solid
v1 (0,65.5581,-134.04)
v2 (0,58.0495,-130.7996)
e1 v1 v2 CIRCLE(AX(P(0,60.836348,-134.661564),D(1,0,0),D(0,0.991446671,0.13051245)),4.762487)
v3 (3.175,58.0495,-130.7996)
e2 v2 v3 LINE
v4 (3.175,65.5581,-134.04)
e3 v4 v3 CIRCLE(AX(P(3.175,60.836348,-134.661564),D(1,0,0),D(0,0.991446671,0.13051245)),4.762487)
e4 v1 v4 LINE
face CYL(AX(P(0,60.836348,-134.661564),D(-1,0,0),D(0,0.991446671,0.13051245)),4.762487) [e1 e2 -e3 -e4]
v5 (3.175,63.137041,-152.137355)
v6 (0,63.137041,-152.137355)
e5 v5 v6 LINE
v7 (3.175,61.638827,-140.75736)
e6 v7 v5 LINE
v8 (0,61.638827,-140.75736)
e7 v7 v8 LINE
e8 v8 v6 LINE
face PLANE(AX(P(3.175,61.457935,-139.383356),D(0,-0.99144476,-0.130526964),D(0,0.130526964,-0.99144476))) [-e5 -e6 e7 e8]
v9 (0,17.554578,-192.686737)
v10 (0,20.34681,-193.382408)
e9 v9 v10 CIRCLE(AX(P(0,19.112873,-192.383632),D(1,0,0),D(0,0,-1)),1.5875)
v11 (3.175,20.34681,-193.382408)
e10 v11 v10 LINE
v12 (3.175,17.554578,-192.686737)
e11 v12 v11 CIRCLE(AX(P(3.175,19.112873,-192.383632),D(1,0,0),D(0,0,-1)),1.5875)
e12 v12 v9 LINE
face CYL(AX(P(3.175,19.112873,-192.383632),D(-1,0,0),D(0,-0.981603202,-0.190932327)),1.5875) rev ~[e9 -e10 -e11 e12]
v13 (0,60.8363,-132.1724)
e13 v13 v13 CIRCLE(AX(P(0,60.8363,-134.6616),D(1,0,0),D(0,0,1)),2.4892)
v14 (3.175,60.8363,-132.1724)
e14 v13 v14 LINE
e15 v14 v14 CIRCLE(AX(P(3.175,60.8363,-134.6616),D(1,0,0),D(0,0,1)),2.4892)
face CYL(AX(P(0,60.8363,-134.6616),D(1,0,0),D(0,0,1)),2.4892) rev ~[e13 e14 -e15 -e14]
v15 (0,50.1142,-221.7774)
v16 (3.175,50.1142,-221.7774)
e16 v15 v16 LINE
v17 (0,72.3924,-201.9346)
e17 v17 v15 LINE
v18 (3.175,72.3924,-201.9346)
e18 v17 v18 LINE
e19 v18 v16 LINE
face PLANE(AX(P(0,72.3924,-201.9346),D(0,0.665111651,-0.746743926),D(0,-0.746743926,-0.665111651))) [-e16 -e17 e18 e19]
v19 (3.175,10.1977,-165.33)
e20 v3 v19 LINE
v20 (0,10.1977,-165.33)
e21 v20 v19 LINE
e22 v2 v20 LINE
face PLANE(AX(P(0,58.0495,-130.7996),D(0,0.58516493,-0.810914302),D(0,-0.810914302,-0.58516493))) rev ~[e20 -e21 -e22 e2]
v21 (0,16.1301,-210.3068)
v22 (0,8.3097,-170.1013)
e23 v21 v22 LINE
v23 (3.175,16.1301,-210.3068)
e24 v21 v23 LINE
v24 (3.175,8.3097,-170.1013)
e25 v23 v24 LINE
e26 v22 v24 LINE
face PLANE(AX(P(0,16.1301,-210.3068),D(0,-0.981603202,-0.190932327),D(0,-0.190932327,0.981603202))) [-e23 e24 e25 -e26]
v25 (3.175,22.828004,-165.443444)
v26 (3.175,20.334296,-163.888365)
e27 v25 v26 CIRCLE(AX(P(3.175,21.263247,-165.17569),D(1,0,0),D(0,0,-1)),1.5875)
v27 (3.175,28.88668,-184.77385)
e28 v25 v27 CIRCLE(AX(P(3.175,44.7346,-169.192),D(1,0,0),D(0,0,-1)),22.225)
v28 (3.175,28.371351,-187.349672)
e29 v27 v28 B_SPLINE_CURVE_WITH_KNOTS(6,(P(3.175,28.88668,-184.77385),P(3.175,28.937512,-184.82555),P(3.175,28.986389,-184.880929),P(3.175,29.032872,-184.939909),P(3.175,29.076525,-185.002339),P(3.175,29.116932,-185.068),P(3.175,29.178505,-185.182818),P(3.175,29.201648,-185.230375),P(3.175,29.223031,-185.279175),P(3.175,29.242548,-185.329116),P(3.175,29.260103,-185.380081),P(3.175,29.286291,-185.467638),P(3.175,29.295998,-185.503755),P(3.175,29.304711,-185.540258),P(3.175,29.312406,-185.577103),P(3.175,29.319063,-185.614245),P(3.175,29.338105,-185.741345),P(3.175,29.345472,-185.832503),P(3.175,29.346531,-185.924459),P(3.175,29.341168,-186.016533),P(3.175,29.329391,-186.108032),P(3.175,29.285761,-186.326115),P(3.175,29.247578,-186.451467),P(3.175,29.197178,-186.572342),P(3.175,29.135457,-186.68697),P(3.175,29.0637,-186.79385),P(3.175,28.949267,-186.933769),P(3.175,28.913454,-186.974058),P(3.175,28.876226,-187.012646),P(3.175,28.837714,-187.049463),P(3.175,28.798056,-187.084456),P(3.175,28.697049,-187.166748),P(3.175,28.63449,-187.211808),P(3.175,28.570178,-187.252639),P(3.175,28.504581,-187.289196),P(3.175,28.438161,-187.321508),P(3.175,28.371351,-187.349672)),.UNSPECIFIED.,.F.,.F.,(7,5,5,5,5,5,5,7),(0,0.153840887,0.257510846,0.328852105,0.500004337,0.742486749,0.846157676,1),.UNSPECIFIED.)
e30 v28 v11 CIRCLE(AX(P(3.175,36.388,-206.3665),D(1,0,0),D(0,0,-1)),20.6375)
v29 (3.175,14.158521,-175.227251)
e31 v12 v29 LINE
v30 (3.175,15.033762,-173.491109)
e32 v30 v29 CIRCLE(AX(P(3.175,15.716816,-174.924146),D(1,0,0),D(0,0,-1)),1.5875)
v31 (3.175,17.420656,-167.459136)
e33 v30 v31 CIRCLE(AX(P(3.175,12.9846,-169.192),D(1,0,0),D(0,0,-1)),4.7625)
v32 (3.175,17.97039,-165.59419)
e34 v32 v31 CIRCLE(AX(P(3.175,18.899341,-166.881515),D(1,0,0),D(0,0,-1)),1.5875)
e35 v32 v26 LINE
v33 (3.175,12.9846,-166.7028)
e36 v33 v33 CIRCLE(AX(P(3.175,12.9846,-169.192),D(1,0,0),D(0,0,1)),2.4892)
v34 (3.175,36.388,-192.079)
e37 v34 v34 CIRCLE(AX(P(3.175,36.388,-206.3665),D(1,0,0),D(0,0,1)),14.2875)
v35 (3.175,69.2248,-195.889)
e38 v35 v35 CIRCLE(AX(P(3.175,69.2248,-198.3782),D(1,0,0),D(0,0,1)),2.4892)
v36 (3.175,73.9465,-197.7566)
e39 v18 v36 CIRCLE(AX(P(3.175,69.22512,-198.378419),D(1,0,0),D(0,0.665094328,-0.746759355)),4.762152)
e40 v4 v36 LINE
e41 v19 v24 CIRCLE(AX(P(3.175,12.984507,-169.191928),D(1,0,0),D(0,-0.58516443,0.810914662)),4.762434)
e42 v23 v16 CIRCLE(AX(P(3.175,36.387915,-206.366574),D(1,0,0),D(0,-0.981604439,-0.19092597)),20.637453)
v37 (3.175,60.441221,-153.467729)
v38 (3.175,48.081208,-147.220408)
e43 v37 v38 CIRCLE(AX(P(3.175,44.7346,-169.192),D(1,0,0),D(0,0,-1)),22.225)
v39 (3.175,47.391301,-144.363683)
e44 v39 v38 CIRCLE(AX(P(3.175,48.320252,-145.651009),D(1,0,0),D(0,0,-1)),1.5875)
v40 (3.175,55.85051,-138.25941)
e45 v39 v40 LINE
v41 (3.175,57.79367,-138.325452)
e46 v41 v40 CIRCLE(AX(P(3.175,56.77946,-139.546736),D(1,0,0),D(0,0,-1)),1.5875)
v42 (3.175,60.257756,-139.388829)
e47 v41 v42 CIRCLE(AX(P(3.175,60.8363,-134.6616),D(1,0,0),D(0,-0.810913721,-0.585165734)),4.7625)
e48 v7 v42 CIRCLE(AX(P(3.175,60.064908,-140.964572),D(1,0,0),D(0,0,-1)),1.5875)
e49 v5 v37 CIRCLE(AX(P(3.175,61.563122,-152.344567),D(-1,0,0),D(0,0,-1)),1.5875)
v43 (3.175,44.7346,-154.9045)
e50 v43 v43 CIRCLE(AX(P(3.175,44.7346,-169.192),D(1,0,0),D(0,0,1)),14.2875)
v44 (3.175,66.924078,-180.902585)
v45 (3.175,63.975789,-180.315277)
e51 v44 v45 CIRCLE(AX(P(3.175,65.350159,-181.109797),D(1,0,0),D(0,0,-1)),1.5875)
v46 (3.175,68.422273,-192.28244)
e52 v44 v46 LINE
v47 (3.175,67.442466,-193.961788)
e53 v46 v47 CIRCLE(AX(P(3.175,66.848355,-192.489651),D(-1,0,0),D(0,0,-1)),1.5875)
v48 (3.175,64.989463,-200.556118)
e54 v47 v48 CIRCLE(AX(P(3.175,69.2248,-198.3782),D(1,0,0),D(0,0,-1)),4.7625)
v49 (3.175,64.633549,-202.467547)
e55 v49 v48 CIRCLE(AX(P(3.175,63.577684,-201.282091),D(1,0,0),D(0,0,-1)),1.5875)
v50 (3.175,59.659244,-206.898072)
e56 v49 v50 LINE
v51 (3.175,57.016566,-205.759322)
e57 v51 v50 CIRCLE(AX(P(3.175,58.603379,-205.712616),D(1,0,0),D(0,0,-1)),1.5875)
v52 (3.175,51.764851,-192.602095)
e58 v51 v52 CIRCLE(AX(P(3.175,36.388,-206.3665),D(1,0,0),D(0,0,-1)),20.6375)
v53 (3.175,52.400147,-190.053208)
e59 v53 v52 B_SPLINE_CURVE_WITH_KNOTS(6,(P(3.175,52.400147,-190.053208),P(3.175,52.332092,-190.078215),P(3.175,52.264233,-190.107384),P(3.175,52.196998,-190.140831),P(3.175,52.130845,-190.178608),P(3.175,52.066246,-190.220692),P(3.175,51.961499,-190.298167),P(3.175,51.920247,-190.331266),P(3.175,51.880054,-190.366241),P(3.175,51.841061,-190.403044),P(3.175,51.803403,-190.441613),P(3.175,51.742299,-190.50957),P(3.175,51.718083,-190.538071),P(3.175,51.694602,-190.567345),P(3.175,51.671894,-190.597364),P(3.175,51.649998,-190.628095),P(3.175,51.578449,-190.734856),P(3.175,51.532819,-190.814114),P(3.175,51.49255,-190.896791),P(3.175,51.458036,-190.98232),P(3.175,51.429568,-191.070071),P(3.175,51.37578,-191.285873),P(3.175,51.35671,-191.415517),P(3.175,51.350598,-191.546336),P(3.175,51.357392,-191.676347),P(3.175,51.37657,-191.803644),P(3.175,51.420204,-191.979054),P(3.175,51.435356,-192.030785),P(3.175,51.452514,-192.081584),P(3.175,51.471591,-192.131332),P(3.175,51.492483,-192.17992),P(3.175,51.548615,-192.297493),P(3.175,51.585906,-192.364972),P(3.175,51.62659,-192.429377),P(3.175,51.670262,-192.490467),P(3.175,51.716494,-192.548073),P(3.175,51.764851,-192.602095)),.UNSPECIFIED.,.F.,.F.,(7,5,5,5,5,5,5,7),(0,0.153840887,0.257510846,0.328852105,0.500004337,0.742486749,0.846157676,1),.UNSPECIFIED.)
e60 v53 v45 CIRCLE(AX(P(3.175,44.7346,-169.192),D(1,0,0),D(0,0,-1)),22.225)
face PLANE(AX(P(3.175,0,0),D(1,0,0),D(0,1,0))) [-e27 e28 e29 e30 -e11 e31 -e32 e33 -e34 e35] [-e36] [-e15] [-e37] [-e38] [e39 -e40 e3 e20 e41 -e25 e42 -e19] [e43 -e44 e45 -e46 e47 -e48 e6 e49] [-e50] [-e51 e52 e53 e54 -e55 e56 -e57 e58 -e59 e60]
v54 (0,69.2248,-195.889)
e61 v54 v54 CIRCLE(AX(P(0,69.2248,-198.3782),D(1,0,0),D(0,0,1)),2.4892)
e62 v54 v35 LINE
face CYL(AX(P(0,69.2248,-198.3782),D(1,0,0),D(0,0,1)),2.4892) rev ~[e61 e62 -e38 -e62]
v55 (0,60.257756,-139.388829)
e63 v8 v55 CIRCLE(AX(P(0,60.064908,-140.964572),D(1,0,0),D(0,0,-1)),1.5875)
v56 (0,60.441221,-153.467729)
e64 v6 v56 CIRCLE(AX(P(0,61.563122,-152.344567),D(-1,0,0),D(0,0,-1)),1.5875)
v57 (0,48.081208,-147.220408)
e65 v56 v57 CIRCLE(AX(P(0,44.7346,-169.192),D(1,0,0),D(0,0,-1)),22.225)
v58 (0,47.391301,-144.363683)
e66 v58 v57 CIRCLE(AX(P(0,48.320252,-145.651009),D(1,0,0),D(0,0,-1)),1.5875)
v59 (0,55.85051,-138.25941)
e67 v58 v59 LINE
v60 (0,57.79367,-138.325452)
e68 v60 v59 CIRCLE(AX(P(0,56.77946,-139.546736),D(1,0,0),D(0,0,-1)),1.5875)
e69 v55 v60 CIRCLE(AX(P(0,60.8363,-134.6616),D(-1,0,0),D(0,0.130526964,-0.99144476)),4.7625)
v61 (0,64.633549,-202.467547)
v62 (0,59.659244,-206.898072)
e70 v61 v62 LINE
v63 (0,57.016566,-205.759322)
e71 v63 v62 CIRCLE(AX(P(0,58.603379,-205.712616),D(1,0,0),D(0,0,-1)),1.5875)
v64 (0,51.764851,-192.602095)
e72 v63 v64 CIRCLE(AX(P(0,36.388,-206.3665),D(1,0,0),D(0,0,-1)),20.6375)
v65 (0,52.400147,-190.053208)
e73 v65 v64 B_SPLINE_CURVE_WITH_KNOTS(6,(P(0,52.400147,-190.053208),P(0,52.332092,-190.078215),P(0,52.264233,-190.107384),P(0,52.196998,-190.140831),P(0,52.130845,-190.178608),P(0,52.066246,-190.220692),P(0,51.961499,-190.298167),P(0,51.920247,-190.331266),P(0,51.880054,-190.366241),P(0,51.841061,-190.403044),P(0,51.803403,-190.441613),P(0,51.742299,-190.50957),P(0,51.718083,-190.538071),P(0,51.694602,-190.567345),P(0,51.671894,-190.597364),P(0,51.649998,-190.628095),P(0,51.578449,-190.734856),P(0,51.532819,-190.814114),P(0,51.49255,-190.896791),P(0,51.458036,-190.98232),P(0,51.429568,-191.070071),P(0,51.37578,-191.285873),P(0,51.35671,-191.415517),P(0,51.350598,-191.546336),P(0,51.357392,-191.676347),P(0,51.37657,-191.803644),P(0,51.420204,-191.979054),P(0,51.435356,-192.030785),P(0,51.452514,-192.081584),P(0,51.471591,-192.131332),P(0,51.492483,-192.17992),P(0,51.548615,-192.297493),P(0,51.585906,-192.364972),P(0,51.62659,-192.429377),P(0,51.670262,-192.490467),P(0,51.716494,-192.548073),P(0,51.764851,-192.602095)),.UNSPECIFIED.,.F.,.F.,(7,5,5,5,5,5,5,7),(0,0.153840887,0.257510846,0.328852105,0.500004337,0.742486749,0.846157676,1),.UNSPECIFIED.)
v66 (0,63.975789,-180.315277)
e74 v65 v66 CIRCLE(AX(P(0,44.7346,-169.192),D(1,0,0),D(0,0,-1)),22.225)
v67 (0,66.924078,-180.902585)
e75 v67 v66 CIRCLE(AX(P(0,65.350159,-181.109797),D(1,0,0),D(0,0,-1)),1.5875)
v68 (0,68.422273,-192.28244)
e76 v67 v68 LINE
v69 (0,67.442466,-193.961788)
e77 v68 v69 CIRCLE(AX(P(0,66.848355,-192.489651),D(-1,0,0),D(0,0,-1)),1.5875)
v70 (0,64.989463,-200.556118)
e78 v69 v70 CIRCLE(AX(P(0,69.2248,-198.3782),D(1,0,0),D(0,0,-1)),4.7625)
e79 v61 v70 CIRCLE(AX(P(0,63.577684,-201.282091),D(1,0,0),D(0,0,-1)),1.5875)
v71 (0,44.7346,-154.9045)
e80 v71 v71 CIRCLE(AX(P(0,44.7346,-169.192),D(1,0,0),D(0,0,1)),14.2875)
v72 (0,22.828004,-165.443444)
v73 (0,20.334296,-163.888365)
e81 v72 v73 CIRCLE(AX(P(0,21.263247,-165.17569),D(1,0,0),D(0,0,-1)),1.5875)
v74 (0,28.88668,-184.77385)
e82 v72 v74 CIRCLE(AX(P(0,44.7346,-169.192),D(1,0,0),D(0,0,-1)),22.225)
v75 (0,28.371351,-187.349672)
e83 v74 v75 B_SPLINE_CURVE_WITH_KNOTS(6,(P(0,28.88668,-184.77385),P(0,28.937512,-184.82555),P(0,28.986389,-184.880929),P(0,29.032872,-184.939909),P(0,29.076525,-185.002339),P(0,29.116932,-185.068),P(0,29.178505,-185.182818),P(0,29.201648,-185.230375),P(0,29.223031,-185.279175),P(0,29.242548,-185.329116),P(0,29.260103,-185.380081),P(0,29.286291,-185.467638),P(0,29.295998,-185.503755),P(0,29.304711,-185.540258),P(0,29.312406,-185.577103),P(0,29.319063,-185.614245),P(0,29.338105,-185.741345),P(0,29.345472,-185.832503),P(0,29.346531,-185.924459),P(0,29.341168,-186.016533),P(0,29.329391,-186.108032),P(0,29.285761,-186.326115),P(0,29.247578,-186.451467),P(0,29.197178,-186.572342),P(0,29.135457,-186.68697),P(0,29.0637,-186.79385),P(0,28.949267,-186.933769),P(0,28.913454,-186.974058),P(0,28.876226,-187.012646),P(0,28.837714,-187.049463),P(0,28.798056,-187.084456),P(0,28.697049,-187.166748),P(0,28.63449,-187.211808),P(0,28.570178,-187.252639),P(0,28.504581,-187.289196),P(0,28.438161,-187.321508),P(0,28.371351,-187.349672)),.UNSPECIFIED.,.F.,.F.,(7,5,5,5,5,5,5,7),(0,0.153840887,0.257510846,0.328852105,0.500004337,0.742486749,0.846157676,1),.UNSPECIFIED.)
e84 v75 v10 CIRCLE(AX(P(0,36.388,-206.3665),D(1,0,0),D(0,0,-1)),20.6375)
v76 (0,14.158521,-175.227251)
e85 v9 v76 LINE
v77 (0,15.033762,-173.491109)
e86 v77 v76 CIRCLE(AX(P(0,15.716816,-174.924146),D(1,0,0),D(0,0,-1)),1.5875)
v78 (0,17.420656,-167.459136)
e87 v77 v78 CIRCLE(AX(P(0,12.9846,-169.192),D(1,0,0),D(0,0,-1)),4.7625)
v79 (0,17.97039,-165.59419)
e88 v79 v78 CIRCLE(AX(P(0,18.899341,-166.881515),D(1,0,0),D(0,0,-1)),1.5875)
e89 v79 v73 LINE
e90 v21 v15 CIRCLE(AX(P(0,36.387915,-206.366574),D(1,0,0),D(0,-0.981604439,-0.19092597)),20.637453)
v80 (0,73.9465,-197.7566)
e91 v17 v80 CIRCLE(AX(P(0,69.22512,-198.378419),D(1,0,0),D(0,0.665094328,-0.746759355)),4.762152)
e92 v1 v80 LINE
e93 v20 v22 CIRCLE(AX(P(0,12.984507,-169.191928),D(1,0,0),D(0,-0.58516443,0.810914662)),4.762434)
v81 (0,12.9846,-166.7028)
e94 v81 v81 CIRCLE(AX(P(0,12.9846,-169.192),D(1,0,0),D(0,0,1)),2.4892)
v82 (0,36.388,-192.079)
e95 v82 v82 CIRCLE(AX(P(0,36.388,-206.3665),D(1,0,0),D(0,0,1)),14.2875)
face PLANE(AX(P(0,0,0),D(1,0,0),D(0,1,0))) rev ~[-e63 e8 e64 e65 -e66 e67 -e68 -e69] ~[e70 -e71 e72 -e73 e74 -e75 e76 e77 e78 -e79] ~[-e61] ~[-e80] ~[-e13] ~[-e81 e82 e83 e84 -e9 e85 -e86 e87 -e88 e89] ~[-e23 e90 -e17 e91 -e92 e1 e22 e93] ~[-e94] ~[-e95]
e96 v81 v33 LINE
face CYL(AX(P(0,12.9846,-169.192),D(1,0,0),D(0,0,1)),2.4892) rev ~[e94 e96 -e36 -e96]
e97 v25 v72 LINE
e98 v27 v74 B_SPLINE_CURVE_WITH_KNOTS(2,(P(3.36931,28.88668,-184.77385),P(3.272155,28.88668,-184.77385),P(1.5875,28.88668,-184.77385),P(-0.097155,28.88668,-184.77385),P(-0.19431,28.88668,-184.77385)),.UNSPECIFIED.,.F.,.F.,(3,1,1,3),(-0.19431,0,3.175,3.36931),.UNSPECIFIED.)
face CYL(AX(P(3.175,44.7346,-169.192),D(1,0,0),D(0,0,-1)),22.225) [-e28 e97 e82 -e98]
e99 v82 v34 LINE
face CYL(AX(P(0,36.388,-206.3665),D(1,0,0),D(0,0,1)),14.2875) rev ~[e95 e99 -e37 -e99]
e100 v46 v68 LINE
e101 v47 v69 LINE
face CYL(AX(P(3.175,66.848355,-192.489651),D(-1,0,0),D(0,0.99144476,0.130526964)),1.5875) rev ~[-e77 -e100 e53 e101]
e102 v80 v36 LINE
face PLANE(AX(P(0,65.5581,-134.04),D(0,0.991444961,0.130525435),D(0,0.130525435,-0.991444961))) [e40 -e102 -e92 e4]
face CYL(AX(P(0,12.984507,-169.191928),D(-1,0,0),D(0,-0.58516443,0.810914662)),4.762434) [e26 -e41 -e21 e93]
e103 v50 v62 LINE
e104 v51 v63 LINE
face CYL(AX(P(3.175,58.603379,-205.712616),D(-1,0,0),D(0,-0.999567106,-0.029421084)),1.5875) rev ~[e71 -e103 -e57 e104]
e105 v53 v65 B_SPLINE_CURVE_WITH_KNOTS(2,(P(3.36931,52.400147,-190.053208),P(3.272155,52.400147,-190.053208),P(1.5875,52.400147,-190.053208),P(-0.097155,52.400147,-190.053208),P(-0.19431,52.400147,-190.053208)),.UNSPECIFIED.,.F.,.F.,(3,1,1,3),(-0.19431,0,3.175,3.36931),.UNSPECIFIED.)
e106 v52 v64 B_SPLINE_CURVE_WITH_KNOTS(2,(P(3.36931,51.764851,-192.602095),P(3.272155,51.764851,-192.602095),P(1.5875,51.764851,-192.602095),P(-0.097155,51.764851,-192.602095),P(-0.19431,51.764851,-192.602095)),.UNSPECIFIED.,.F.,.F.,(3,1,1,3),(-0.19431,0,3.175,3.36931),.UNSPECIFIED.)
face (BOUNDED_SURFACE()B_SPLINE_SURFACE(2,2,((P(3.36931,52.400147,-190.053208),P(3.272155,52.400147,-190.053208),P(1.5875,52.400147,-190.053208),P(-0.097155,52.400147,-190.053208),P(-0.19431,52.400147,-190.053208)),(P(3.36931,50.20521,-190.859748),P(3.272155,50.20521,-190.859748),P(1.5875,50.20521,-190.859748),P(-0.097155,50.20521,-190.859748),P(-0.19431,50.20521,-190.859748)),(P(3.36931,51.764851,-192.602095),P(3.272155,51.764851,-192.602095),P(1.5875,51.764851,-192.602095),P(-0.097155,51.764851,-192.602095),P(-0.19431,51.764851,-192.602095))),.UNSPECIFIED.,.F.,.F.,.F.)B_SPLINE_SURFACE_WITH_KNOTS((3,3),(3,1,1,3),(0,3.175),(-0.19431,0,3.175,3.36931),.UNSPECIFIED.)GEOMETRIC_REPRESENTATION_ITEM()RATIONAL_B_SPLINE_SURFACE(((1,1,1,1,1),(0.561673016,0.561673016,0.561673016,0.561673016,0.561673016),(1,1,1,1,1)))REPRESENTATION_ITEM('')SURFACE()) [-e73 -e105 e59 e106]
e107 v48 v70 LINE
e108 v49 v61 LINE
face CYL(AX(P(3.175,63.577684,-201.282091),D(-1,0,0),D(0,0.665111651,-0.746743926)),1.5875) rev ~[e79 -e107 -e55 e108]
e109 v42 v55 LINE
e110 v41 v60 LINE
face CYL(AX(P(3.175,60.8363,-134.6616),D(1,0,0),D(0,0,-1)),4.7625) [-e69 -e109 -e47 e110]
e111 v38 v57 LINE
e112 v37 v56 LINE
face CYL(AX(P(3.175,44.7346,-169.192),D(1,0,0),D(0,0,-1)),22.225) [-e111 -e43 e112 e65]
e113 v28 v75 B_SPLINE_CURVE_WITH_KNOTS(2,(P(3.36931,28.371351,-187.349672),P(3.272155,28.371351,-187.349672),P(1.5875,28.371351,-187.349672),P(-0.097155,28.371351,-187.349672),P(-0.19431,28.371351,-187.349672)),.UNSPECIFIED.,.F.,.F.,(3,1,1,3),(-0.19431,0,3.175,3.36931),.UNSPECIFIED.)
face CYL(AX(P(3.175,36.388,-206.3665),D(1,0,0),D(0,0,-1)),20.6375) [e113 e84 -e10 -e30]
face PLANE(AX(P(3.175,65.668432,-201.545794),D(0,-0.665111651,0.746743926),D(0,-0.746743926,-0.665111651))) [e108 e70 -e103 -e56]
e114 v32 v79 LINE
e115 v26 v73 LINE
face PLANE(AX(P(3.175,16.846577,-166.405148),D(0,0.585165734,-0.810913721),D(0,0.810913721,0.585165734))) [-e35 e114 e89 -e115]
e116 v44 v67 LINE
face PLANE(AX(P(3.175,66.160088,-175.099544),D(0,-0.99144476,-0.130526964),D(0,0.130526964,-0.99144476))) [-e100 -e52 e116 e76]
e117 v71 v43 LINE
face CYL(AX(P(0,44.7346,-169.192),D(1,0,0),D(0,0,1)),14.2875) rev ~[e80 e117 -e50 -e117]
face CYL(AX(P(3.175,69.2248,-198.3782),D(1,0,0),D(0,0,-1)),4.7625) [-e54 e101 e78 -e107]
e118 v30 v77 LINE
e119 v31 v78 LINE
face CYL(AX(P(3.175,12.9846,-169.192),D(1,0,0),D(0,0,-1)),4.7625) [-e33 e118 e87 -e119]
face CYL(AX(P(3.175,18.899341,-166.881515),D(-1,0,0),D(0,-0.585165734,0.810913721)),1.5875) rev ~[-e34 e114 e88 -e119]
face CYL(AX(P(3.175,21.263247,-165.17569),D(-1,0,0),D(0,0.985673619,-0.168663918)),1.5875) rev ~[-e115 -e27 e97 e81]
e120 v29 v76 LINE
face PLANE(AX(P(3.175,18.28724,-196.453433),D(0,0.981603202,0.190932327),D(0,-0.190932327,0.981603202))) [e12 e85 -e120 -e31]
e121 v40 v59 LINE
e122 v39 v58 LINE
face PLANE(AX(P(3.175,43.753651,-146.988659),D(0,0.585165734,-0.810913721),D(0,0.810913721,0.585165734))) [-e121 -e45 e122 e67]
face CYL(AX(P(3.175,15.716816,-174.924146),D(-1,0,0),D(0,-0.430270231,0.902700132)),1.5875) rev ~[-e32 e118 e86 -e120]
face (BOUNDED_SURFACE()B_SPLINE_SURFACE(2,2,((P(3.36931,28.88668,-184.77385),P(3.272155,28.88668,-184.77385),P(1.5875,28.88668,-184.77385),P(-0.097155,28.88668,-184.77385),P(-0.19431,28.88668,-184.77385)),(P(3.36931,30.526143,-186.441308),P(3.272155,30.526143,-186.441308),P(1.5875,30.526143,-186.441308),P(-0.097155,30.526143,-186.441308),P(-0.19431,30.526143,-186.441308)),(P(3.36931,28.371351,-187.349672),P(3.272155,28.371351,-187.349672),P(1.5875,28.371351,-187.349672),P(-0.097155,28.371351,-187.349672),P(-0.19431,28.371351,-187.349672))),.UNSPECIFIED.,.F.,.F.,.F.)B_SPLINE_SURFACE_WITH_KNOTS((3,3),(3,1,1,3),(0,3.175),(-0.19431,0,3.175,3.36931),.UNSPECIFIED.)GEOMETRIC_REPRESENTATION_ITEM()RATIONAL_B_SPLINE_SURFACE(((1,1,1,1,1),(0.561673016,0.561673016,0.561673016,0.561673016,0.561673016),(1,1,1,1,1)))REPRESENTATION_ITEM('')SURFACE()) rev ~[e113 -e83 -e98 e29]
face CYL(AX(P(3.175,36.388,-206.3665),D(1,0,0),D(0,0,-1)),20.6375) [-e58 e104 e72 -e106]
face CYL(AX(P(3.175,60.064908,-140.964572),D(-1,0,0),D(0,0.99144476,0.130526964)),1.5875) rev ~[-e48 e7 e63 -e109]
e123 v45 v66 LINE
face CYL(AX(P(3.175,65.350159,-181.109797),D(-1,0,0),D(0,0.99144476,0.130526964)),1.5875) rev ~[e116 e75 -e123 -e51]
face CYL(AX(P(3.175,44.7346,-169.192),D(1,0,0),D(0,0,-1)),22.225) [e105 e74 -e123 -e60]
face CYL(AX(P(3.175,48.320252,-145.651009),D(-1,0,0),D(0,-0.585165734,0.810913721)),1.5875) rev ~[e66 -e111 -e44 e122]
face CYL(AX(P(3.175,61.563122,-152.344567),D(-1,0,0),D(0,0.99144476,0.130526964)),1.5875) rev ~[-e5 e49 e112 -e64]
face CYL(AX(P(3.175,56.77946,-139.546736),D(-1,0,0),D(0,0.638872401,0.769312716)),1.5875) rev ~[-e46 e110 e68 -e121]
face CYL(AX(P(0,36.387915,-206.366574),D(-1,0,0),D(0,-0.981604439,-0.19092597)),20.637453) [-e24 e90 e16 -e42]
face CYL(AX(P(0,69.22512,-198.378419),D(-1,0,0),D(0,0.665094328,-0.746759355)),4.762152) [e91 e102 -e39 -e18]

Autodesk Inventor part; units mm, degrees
ref_plane "YZ Plane" through (0, 0, 0) normal (1, 0, 0) x (0, 1, 0)
ref_plane "XZ Plane" through (0, 0, 0) normal (0, 1, 0) x (-1, 0, 0)
ref_plane "XY Plane" through (0, 0, 0) normal (0, 0, 1) x (1, 0, 0)
sketch "Sketch1" plane through (0, 0, 0) normal (1, 0, 0) x (0, 1, 0)
  line L0 (0, -277.9865) -> (0, 46.3311) construction
  line L1 (36.388, -206.3665) -> (0, 0) construction
  arc A0 (16.1301, -210.3068) -> (50.1142, -221.7774) centre (36.388, -206.3665) ccw
  line L2 (60.8363, -134.6616) -> (44.7346, -169.192) construction
  arc A1 (65.5581, -134.04) -> (58.0495, -130.7996) centre (60.8363, -134.6616) ccw
  arc A2 (72.3924, -201.9346) -> (73.9465, -197.7566) centre (69.2248, -198.3782) ccw
  arc A3 (10.1977, -165.33) -> (8.3097, -170.1013) centre (12.9846, -169.192) ccw
  line L3 (65.5581, -134.04) -> (73.9465, -197.7566)
  line L4 (72.3924, -201.9346) -> (50.1142, -221.7774)
  line L5 (16.1301, -210.3068) -> (8.3097, -170.1013)
  line L6 (69.2248, -198.3782) -> (44.7346, -169.192) construction
  line L7 (58.0495, -130.7996) -> (10.1977, -165.33)
  line L8 (44.7346, -169.192) -> (12.9846, -169.192) construction
  dimension "d8" = 209.55
  dimension "d9" = 175.006
  dimension "d11" = 10
  dimension "d12" = 20.6375
  dimension "d13" = 38.1
  dimension "d14" = 25
  dimension "d19" = 4.7625
  dimension "d37" = 40
  dimension "d39" = 90
  dimension "d40" = 31.75
  dimension "d41" = 38.1
extrude "Plate1" add sketch "Sketch1" along normal blind 3.175
hole "Hole1" at (0, 60.8363, -134.6616) at (0, 12.9846, -169.192) at (0, 69.2248, -198.3782) direction (1, 0, 0) diameter 4.9784 end through all clearance for "Flat Head Machine Screw (82)" size "#10" standard "Ansi Unified Screw Threads"
hole "Hole2" at (0, 36.388, -206.3665) at (0, 44.7346, -169.192) direction (1, 0, 0) diameter 28.575 end through all
sketch "Sketch2" plane through (3.175, 0, 0) normal (1, 0, 0) x (0, 0, -1)
  circle A0 centre (169.192, 44.7346) radius 14.2875 projected
  circle A1 centre (206.3665, 36.388) radius 14.2875 projected
  circle A2 centre (198.3782, 69.2248) radius 2.4892 projected
  circle A3 centre (169.192, 12.9846) radius 2.4892 projected
  circle A4 centre (134.6616, 60.8363) radius 2.4892 projected
  arc A5 (134.04, 65.5581) -> (130.7996, 58.0495) centre (134.6616, 60.8363) ccw projected
  line L0 (165.33, 10.1977) -> (130.7996, 58.0495) projected
  arc A6 (165.33, 10.1977) -> (170.1013, 8.3097) centre (169.192, 12.9846) ccw projected
  line L1 (210.3068, 16.1301) -> (170.1013, 8.3097) projected
  arc A7 (210.3068, 16.1301) -> (221.7774, 50.1142) centre (206.3665, 36.388) ccw projected
  line L2 (201.9346, 72.3924) -> (221.7774, 50.1142) projected
  arc A8 (201.9346, 72.3924) -> (197.7566, 73.9465) centre (198.3782, 69.2248) ccw projected
  line L3 (134.04, 65.5581) -> (197.7566, 73.9465) projected
  line L4 (134.6616, 60.8363) -> (198.3782, 69.2248)
  line L5 (198.3782, 69.2248) -> (218.221, 46.9466)
  arc A9 (209.3975, 20.805) -> (218.221, 46.9466) centre (206.3665, 36.388) ccw
  line L6 (209.3975, 20.805) -> (169.192, 12.9846)
  line L7 (169.192, 12.9846) -> (134.6616, 60.8363)
  circle A10 centre (134.6616, 60.8363) radius 4.7625
  circle A11 centre (198.3782, 69.2248) radius 4.7625
  circle A12 centre (169.192, 12.9846) radius 4.7625
  circle A13 centre (169.192, 44.7346) radius 22.225
  circle A14 centre (206.3665, 36.388) radius 20.6375
  point P0 (0, 0)
  point P1 (196.4534, 18.2872)
  point P2 (186.5015, 30.7943)
  point P3 (161.2634, 23.9719)
  point P4 (166.4051, 16.8466)
  point P5 (173.8668, 13.8939)
  point P6 (190.7995, 49.937)
  point P7 (209.4503, 56.7938)
  point P8 (201.5458, 65.6684)
  point P9 (193.6565, 68.6032)
  point P10 (175.0995, 66.1601)
  point P11 (146.9886, 43.7537)
  point P12 (157.9404, 63.901)
  point P13 (139.3834, 61.458)
  point P14 (137.4485, 56.9744)
  dimension "d42" = 4.7625
  dimension "d44" = 41.275
  dimension "d45" = 44.45
extrude "Cut1" cut sketch "Sketch2" against normal blind 3.175 contours A11 L5 A14 A13 L4 | A13 L7 A10 L4 | A14 L6 A12 L7 A13
fillet "Corner Round1" radius 1.5875 14 edges at (1.5875, 43.7537, -146.9886) (1.5875, 63.901, -157.9404) (1.5875, 56.9744, -137.4485) (1.5875, 56.7938, -209.4503) (1.5875, 30.7943, -186.5015) (1.5875, 13.8939, -173.8668) (1.5875, 18.2872, -196.4534) (1.5875, 49.937, -190.7995) (1.5875, 61.458, -139.3834) (1.5875, 68.6032, -193.6565) (1.5875, 65.6684, -201.5458) (1.5875, 66.1601, -175.0995) (1.5875, 16.8466, -166.4051) (1.5875, 23.9719, -161.2634)
equation "\"d25\" = Thickness"
equation "\"d46\" = Thickness"
equation "\"d7\" = Thickness"
equation "\"BendRadius\" = Thickness"
equation "\"BendReliefWidth\" = Thickness"
equation "\"BendReliefDepth\" = 0.5 * Thickness"
equation "\"CornerReliefSize\" = 4 * Thickness"
equation "\"MinimumRemnant\" = 2 * Thickness"
equation "\"TransitionRadius\" = BendRadius"
equation "\"JacobiRadiusSize\" = BendRadius"
equation "\"GapSize\" = Thickness"
equation "\"Thickness\" = 3.175"
properties part number "PLATE,BEARING,MOUNT"
